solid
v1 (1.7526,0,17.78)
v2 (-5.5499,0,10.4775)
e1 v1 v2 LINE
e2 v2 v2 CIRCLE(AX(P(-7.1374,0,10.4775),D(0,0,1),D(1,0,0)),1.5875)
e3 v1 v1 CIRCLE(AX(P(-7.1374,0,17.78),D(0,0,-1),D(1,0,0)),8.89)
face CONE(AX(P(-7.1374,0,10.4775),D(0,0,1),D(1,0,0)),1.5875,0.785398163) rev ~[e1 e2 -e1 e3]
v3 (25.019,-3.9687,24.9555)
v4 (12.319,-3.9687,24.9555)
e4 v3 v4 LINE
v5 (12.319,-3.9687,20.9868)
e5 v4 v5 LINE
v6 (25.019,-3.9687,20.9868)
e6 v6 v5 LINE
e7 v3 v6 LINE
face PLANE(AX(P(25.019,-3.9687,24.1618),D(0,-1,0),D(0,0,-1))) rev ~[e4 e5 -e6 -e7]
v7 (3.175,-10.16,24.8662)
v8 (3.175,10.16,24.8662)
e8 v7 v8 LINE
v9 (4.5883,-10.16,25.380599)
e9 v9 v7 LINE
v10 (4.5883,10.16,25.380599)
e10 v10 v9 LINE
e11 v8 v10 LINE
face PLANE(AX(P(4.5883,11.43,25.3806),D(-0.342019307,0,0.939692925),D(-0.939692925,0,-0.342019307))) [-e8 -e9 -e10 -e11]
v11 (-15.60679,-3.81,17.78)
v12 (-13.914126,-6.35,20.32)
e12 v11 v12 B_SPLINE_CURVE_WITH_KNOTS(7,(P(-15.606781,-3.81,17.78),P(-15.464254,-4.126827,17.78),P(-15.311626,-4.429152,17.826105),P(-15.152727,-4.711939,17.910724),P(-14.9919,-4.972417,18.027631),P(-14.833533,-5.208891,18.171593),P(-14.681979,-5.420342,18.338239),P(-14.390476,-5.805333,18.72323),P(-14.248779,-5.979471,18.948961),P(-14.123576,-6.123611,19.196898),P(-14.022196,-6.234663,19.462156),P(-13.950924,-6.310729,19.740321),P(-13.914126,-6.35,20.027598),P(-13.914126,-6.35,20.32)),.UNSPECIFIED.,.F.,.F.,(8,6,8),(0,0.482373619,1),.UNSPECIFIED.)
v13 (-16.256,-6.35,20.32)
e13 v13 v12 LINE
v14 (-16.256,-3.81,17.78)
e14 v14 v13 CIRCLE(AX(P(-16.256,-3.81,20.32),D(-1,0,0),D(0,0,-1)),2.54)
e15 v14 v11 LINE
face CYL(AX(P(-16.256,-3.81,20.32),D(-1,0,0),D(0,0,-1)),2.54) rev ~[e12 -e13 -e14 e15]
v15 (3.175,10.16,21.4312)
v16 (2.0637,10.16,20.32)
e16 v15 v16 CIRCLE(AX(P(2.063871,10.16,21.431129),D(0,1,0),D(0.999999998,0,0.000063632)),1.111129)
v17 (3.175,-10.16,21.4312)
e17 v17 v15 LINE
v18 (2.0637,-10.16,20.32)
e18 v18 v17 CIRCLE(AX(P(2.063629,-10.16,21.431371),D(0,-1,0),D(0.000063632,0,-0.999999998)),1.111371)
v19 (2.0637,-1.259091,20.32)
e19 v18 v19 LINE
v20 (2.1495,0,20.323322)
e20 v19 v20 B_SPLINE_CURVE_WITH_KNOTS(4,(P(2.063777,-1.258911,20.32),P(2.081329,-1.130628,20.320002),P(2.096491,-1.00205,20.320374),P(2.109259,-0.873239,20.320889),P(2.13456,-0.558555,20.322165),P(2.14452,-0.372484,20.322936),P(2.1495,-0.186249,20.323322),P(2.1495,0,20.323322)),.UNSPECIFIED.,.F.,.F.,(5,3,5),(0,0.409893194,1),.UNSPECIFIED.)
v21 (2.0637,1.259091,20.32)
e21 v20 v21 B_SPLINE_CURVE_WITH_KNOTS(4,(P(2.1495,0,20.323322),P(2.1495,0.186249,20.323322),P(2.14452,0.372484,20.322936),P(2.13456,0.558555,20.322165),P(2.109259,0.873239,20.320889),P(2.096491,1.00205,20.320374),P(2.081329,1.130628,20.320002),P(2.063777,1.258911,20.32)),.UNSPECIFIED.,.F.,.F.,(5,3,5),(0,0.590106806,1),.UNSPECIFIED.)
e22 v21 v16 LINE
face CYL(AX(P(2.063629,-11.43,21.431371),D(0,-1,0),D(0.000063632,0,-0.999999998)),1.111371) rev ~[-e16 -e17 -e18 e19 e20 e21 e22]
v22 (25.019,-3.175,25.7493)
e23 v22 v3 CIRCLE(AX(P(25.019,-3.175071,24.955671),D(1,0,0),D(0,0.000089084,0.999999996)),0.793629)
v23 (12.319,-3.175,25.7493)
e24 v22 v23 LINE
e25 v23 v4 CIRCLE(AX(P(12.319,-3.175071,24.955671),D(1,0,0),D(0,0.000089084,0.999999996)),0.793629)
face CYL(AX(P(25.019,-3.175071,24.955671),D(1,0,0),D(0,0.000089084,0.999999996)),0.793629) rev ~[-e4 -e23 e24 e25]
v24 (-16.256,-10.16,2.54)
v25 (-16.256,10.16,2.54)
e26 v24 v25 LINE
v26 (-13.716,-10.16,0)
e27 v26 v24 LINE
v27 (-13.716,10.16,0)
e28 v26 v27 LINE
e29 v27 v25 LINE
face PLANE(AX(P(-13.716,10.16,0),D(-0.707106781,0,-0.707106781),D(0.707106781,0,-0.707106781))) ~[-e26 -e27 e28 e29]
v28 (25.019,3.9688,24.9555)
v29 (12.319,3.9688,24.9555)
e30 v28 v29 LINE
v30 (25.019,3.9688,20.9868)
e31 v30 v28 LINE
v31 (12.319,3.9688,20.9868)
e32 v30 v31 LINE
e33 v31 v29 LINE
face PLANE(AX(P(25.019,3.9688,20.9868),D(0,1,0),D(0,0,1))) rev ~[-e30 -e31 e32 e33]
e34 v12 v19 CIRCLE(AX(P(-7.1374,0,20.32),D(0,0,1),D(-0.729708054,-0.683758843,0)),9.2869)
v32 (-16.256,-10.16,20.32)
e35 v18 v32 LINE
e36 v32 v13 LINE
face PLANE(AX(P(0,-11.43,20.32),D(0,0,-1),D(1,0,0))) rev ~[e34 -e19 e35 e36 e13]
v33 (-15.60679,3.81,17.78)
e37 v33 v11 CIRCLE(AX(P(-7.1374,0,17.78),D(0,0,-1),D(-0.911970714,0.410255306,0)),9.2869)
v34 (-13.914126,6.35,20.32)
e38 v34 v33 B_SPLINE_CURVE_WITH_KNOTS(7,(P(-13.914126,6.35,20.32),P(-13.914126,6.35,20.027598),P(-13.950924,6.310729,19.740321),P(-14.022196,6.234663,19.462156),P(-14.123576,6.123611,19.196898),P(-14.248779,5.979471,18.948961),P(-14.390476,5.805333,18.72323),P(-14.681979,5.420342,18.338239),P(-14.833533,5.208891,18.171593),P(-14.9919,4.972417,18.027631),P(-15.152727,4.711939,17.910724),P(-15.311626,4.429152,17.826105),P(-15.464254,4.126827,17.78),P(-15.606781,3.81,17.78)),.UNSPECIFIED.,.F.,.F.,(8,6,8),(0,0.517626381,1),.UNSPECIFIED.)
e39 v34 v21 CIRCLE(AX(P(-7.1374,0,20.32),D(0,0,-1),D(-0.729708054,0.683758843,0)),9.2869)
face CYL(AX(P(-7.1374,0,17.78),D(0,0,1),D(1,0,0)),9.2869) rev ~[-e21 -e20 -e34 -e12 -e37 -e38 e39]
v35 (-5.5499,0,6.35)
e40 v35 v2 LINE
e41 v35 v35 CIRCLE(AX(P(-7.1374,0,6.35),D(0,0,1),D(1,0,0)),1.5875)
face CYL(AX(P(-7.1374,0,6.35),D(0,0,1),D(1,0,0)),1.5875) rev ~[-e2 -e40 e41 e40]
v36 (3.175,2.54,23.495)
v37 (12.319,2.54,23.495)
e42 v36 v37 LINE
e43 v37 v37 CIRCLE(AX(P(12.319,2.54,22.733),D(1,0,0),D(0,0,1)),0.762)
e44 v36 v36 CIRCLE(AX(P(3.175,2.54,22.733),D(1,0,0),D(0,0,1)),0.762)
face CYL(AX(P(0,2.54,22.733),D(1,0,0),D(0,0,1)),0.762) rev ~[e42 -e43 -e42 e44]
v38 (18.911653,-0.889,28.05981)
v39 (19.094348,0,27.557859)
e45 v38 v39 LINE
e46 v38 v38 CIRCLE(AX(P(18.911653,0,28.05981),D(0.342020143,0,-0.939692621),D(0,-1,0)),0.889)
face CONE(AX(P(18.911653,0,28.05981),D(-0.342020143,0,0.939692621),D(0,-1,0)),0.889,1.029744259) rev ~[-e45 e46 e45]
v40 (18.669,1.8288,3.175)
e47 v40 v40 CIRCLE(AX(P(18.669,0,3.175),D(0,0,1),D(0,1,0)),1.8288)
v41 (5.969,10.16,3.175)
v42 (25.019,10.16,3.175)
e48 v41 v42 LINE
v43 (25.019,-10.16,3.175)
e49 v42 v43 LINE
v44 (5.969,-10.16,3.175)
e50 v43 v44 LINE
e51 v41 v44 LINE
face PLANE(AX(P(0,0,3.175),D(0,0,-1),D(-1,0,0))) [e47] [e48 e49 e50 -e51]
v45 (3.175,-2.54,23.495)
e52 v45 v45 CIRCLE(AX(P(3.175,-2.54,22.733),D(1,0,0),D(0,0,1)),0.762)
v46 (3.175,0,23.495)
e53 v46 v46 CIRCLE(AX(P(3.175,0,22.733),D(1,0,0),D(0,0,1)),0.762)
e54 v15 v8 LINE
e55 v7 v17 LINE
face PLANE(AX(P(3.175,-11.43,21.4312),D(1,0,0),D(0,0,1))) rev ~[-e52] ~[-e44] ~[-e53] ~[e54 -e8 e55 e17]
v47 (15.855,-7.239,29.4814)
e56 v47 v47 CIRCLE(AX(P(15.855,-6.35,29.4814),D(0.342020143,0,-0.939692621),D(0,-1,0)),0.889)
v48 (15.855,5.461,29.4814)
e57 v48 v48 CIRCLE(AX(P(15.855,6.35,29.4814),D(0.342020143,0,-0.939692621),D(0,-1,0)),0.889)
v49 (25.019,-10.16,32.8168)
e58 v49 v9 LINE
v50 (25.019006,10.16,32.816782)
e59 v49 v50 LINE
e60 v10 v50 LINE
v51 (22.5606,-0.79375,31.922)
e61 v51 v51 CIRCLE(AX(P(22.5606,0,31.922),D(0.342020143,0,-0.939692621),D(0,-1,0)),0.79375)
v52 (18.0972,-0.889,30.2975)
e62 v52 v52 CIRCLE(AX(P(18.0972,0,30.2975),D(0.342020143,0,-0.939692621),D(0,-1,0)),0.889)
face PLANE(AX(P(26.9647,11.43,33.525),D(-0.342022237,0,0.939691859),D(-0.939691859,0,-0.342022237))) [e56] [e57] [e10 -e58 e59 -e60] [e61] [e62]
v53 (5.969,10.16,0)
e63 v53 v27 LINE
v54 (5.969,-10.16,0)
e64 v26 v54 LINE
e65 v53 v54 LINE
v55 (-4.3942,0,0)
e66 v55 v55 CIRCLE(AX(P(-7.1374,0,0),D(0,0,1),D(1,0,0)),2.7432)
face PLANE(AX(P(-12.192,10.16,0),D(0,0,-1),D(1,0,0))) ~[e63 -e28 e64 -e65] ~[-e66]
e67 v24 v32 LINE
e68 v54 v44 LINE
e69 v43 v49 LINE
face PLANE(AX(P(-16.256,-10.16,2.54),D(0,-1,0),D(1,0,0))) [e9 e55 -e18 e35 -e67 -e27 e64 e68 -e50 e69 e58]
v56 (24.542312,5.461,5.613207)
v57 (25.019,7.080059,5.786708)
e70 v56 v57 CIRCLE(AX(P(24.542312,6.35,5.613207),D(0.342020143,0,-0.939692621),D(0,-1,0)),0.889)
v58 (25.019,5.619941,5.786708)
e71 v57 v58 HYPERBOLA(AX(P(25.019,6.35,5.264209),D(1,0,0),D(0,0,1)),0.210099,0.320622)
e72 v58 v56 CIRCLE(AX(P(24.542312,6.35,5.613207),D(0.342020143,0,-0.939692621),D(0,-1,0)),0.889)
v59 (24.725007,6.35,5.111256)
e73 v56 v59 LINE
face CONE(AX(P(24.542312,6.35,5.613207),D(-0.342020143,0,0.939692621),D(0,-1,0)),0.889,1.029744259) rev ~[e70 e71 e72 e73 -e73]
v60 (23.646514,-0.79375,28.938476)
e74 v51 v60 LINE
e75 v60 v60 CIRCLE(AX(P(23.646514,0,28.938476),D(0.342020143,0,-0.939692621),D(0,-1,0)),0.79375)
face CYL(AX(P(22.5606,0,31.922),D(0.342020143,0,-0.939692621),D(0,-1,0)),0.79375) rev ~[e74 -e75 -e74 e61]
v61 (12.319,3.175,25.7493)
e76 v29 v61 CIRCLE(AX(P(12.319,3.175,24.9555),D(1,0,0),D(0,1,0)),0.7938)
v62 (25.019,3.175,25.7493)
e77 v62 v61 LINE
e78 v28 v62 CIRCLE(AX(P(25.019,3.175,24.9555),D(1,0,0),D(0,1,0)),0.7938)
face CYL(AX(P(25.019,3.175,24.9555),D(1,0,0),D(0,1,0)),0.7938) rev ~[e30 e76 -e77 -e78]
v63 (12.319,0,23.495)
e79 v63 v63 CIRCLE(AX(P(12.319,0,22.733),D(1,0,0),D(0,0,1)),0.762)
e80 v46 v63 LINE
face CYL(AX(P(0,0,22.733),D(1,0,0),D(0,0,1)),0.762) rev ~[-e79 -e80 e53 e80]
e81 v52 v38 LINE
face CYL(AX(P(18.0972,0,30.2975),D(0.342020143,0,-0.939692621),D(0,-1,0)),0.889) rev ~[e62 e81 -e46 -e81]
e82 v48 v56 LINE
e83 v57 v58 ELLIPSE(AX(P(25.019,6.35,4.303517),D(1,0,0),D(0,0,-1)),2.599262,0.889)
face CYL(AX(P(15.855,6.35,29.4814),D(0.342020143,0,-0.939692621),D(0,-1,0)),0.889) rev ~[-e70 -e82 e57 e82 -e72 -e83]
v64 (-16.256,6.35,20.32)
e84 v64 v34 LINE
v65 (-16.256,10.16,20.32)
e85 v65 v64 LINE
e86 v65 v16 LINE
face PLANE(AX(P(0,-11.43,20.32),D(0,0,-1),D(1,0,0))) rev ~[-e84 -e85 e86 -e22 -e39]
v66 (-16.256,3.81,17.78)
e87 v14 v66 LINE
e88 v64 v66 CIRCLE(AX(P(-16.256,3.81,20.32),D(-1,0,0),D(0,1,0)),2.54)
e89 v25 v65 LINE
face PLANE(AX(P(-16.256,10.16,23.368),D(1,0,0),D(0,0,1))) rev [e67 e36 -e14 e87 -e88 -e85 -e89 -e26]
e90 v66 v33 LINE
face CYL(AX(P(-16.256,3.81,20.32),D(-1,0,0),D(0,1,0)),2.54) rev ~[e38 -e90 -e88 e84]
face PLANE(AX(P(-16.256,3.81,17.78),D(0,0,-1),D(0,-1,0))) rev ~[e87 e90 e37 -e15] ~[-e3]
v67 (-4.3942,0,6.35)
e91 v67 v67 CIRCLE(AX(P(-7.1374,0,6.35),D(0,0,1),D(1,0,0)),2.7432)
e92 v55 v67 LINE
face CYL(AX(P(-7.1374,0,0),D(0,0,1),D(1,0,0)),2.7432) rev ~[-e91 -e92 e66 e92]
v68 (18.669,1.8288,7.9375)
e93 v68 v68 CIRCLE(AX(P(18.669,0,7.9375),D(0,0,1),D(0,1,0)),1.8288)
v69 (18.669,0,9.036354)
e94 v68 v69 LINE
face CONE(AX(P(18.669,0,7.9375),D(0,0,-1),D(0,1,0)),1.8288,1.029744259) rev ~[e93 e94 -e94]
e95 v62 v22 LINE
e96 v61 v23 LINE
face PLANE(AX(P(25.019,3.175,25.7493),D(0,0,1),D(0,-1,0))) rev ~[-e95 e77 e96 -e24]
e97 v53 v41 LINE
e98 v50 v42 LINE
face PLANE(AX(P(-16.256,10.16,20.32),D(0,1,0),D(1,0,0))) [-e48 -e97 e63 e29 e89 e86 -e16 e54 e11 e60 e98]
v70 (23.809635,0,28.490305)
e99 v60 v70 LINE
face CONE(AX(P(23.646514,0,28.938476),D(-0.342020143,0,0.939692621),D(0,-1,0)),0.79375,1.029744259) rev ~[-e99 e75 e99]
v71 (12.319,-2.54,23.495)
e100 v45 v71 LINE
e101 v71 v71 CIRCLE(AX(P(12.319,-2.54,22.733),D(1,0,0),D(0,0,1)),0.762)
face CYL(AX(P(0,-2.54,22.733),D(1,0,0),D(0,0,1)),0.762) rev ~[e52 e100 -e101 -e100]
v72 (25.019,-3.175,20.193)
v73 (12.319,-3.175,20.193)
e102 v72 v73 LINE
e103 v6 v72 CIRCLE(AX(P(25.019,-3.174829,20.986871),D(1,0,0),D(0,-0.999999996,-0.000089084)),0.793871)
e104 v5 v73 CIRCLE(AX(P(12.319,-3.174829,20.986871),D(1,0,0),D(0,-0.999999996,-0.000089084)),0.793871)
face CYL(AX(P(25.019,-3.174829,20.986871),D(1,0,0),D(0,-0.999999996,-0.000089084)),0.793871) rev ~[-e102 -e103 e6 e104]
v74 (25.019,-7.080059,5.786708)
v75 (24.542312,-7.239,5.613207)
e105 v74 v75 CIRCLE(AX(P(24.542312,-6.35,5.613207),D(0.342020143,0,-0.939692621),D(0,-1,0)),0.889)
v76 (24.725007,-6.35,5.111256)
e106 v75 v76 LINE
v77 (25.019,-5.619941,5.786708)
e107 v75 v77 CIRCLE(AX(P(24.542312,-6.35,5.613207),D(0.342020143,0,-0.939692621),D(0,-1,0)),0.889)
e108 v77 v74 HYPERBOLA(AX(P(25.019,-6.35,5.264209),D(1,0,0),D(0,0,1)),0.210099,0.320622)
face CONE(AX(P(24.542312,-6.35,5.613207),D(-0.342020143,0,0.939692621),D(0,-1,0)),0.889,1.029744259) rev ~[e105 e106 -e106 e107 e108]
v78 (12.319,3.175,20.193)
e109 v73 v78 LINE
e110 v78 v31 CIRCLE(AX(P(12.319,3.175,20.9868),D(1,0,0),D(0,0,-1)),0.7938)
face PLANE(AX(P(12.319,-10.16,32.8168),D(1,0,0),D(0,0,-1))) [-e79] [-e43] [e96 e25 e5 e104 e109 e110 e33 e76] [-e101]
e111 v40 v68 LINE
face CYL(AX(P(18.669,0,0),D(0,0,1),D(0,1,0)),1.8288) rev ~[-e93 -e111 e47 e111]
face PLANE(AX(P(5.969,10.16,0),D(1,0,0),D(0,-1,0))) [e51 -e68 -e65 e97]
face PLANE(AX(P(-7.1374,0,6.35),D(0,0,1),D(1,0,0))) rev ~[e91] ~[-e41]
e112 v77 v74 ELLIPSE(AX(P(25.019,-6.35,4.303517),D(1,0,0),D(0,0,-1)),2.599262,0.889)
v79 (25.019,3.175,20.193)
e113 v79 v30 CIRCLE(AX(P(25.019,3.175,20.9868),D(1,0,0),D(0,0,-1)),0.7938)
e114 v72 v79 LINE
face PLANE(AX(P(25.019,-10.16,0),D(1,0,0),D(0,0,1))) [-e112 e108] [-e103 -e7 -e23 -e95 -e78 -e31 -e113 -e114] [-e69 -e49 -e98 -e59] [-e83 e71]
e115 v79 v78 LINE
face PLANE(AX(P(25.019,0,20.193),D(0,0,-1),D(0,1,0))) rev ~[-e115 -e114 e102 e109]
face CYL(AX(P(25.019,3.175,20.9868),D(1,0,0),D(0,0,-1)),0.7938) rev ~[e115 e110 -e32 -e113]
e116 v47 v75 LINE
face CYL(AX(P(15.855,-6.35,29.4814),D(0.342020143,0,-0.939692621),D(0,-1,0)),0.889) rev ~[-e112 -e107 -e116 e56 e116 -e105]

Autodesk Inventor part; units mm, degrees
sketch "Sketch1" plane through (0, 0, 0) normal (0, 0, 1) x (1, 0, 0)
  line L0 (0, 24.892) -> (0, -24.892) projected
  line L1 (-25.6032, 0) -> (39.8272, 0) projected
  line L2 (30.48, -17.78) -> (-16.256, -17.78)
  line L3 (-16.256, -17.78) -> (-16.256, 17.78)
  line L4 (-16.256, 17.78) -> (30.48, 17.78)
  line L5 (30.48, 17.78) -> (30.48, -17.78)
  dimension "d0" = 30.48
  dimension "d1" = 16.256
  dimension "d2" = 17.78
  dimension "d3" = 35.56
extrude "Extrusion1" add sketch "Sketch1" along normal blind 45.72
sketch "Sketch2" plane through (-16.256, -17.78, 0) normal (0, -1, 0) x (1, 0, 0)
  line L0 (46.736, 45.72) -> (0, 45.72) projected
  line L1 (0, 0) -> (0, 45.72) projected
  line L2 (46.736, 0) -> (0, 0) projected
  line L3 (16.256, 54.864) -> (16.256, -9.144) projected
  line L4 (16.256, 45.72) -> (16.256, 20.32)
  line L5 (16.256, 20.32) -> (4.064, 20.32)
  line L6 (4.064, 20.32) -> (4.064, 23.368)
  arc A0 (4.064, 23.368) -> (0, 23.368) centre (2.032, 23.368) ccw
  line L7 (0, 23.368) -> (0, 45.72)
  line L8 (0, 45.72) -> (16.256, 45.72)
  line L9 (0, 2.54) -> (2.54, 0)
  line L10 (2.54, 0) -> (0, 0)
  line L11 (0, 0) -> (0, 2.54)
  dimension "d6" = 25.4
  dimension "d7" = 2.032
  dimension "d8" = 2.032
  dimension "d9" = 3.048
  dimension "d10" = 2.54
  dimension "d11" = 2.54
  dimension "d12" = 4.064
extrude "Extrusion2" cut sketch "Sketch2" against normal through all contours L3 L5 L6 A0 L1 L0 | L9 L2 L1
sketch "Sketch3" plane through (-16.256, -17.78, 23.368) normal (-1, 0, 0) x (0, 0, 1)
  line L0 (-20.828, 35.56) -> (0, 35.56) projected
  line L1 (-20.828, 0) -> (0, 0) projected
  line L2 (-32.512, 17.78) -> (31.496, 17.78) projected
  line L3 (2.032, 35.56) -> (2.032, 0) projected
  line L4 (2.032, 35.56) -> (0, 35.56) projected
  line L5 (-23.368, 35.56) -> (-20.828, 35.56) projected
  line L6 (-20.828, 0) -> (-23.368, 0) projected
  line L7 (0, 0) -> (2.032, 0) projected
  line L8 (2.032, 0) -> (-23.368, 0)
  line L9 (-23.368, 0) -> (-23.368, 5.08)
  line L10 (-23.368, 5.08) -> (-3.048, 5.08)
  line L11 (-3.048, 5.08) -> (-3.048, 6.35)
  line L12 (-3.048, 6.35) -> (2.032, 6.35)
  line L13 (2.032, 6.35) -> (2.032, 0)
  line L14 (-20.828, 35.56) -> (0, 35.56)
  line L15 (-20.828, 35.56) -> (-23.368, 35.56)
  line L16 (0, 35.56) -> (2.032, 35.56)
  line L17 (2.032, 35.56) -> (-23.368, 35.56)
  line L18 (-23.368, 35.56) -> (-23.368, 30.48)
  line L19 (-23.368, 30.48) -> (-3.048, 30.48)
  line L20 (-3.048, 30.48) -> (-3.048, 29.21)
  line L21 (-3.048, 29.21) -> (2.032, 29.21)
  line L22 (2.032, 29.21) -> (2.032, 35.56)
  dimension "d15" = 6.35
  dimension "d16" = 5.08
  dimension "d17" = 5.08
extrude "Extrusion3" cut sketch "Sketch3" against normal up to surface (16.256 mm away)
sketch "Sketch4" plane through (-16.256, -12.7, 2.54) normal (-1, 0, 0) x (0, 0, 1)
  line L0 (-11.684, 12.7) -> (52.324, 12.7) projected
  line L1 (22.86, 24.13) -> (22.86, 1.27) projected
  line L2 (22.86, 12.7) -> (22.86, 6.35)
  line L3 (17.78, 6.35) -> (22.86, 6.35)
  line L4 (15.24, 8.89) -> (15.24, 12.7)
  line L5 (15.24, 12.7) -> (22.86, 12.7)
  arc A0 (15.24, 8.89) -> (17.78, 6.35) centre (17.78, 8.89) ccw
  line L6 (22.86, 12.7) -> (22.86, 19.05)
  line L7 (17.78, 19.05) -> (22.86, 19.05)
  line L8 (15.24, 16.51) -> (15.24, 12.7)
  arc A1 (17.78, 19.05) -> (15.24, 16.51) centre (17.78, 16.51) ccw
  dimension "d20" = 2.54
  dimension "d21" = 6.35
  dimension "d22" = 7.62
extrude "Extrusion4" cut sketch "Sketch4" against normal blind 7.874
sketch "Sketch11" plane through (0, -17.78, 0) normal (-1, 0, 0) x (0, 0, 1)
  line L0 (20.32, 5.08) -> (20.32, 30.48) projected
  line L1 (45.72, 35.56) -> (45.72, 0) projected
  line L2 (-9.144, 17.78) -> (54.864, 17.78) projected
  line L3 (20.32, 25.4) -> (20.32, 10.16) projected
  point P0 (20.32, 24.3791)
  point P1 (20.32, 11.1809)
  point P2 (43.18, 16.51)
  point P3 (43.18, 19.05)
  point P4 (23.368, 17.78)
  point P5 (22.733, 17.78)
  dimension "d73" = 1.27
  dimension "d74" = 1.27
  dimension "d75" = 2.54
  dimension "d76" = 2.54
  dimension "d78" = 0.635
  dimension "d476" = 2.413
hole "Hole3" at (0, 0, 22.733) direction (1, 0, 0) diameter 1.524 end through all
sketch "Sketch21" plane through (0, 0, 0) normal (0, 1, 0) x (-1, 0, 0)
  line L0 (0, -4.064) -> (0, 24.384) projected
  line L1 (13.716, 0) -> (0, 0) projected
  line L2 (16.256, 20.32) -> (16.256, 2.54) projected
  line L3 (4.3942, 0) -> (7.1374, 0)
  line L4 (4.3942, 0) -> (4.3942, 6.35)
  line L5 (4.3942, 6.35) -> (5.5499, 6.35)
  line L6 (5.5499, 6.35) -> (5.5499, 10.4775)
  line L7 (0, 20.32) -> (16.256, 20.32) projected
  line L8 (7.1374, 0) -> (7.1374, 20.32)
  line L9 (5.5499, 10.4775) -> (-1.7526, 17.78)
  line L10 (-1.7526, 17.78) -> (-1.7526, 20.32)
  line L11 (-1.7526, 20.32) -> (7.1374, 20.32)
  line L12 (-1.7526, 17.78) -> (-2.1495, 17.78)
  line L13 (-2.1495, 17.78) -> (-2.1495, 20.32)
  line L14 (-2.1495, 20.32) -> (-1.7526, 20.32)
  line L15 (-1.7526, 20.32) -> (-1.7526, 17.78)
  dimension "d159" = 7.1374
  dimension "d160" = 8.89
  dimension "d162" = 45
  dimension "d163" = 1.5875
  dimension "d164" = 2.7432
  dimension "d165" = 6.35
  dimension "d292" = 0.3969
  dimension "d322" = 2.54
revolve "Revolution5" cut sketch "Sketch21" angle 360 about axis through (-7.1374, 0, 0) along (0, 0, 1) contours L9 L10 L11 L0 | L0 L7 L8 L1 L4 L5 L6 L9 | L12 L13 L14 L10
sketch "Sketch23" plane through (0, 0, 0) normal (0, 0, -1) x (-1, 0, 0)
  line L0 (13.716, 12.7) -> (0, 12.7) projected
  line L1 (0, 17.78) -> (-30.48, 17.78) projected
  line L2 (-39.8272, 0) -> (25.6032, 0) projected
  line L3 (16.256, 12.7) -> (16.256, -12.7) projected
  line L4 (0, -12.7) -> (13.716, -12.7) projected
  line L5 (-30.48, -17.78) -> (0, -17.78) projected
  line L6 (8.382, -12.7) -> (8.382, -11.43)
  line L7 (-30.48, 17.78) -> (-30.48, -17.78) projected
  line L8 (8.382, -11.43) -> (-30.48, -11.43)
  line L9 (-30.48, -11.43) -> (-30.48, -17.78)
  line L10 (-30.48, -17.78) -> (8.382, -17.78)
  line L11 (8.382, -17.78) -> (8.382, -12.7)
  dimension "d193" = 7.874
  dimension "d231" = 6.35
extrude "Extrusion12" cut sketch "Sketch23" against normal blind 27.94
mirror "Mirror5" about plane through (0, 0, 0) normal (0, 1, 0) of "Extrusion12"
sketch "Sketch32" plane through (0, 17.78, 45.72) normal (0, 1, 0) x (1, 0, 0)
  line L0 (30.48, 17.78) -> (0, 17.78) projected
  line L1 (0, 17.78) -> (0, 0) projected
  line L2 (0, 0) -> (30.48, 0) projected
  line L3 (30.48, 17.78) -> (30.48, 0) projected
extrude "Extrusion16" cut sketch "Sketch32" against normal up to surface (6.35 mm away)
sketch "Sketch33" plane through (0, -17.78, 45.72) normal (0, -1, 0) x (1, 0, 0)
  circle A0 centre (3.1266, -12.4245) radius 0.7366 projected
  line L0 (0, -17.78) -> (30.48, -17.78) projected
  line L1 (30.48, -17.78) -> (30.48, 0) projected
  line L2 (30.48, 0) -> (0, 0) projected
  line L3 (0, 0) -> (0, -17.78) projected
extrude "Extrusion17" cut sketch "Sketch33" against normal up to surface (6.35 mm away)
sketch "Sketch34" plane through (0, 11.43, 45.72) normal (0, 1, 0) x (1, 0, 0)
  line L0 (0, 0) -> (0, 25.4) projected
  line L1 (30.48, 0) -> (0, 0) projected
  line L2 (30.48, 45.72) -> (30.48, 0) projected
  line L3 (26.9647, 12.195) -> (4.5883, 20.3394) projected
  line L4 (26.9647, 12.195) -> (30.48, 10.9156)
  line L5 (4.5883, 20.3394) -> (0, 22.0094)
  point P0 (0, 24.13)
extrude "Extrusion18" cut sketch "Sketch34" along normal through all both and the other way through all
sketch "Sketch35" plane through (-8.382, -11.43, 0) normal (0, -1, 0) x (1, 0, 0)
  line L0 (38.862, 34.8044) -> (8.382, 23.7106) projected
  line L1 (8.382, 20.32) -> (8.382, 23.7106) projected
  line L2 (38.862, 34.8044) -> (38.862, 0) projected
  line L3 (8.382, 20.32) -> (10.4457, 20.32)
  line L4 (11.557, 21.4312) -> (11.557, 24.8662)
  arc A0 (10.4457, 20.32) -> (11.557, 21.4312) centre (10.4457, 21.4312) ccw
  dimension "d284" = 1.1113
  dimension "d285" = 3.175
extrude "Extrusion19" cut sketch "Sketch35" against normal through all
sketch "Sketch38" plane through (0, 0, 0) normal (0, 0, -1) x (-1, 0, 0)
  line L0 (8.382, 11.43) -> (17.907, 11.43)
  line L1 (17.907, 11.43) -> (17.907, 14.605)
  line L2 (17.907, 14.605) -> (8.382, 14.605)
  line L3 (8.382, -11.43) -> (17.907, -11.43)
  line L4 (17.907, -11.43) -> (17.907, -14.605)
  line L5 (17.907, -14.605) -> (8.382, -14.605)
  line L6 (13.716, 12.7) -> (8.382, 12.7) projected
  line L7 (8.382, 11.43) -> (8.382, 14.605)
  line L8 (8.382, -11.43) -> (8.382, -14.605)
  dimension "d293" = 3.175
  dimension "d294" = 3.175
  dimension "d295" = 9.525
extrude "Extrusion22" cut sketch "Sketch38" against normal through all
sketch "Sketch39" plane through (-16.256, -11.43, 2.54) normal (0, -1, 0) x (1, 0, 0)
  line L0 (4.064, 17.78) -> (18.3197, 17.78) projected
  line L1 (4.064, 20.828) -> (4.064, 17.78) projected
  arc A0 (4.064, 20.828) -> (0, 20.828) centre (2.032, 20.828) ccw projected
  line L2 (0, 0) -> (0, 20.828) projected
  line L3 (2.54, -2.54) -> (0, 0) projected
  line L4 (46.736, -2.54) -> (2.54, -2.54) projected
  line L5 (46.736, 32.2644) -> (46.736, -2.54) projected
  line L6 (46.736, 32.2644) -> (19.431, 22.3262) projected
  line L7 (19.431, 22.3262) -> (19.431, 18.8912) projected
  arc A1 (18.3197, 17.78) -> (19.431, 18.8912) centre (18.3197, 18.8912) ccw projected
  line L8 (4.4328, 17.78) -> (0, 17.78)
extrude "Extrusion23" cut sketch "Sketch39" against normal through all contours L8 L2 A0 L1
sketch "Sketch45" plane through (-16.256, -11.43, 2.54) normal (0, -1, 0) x (1, 0, 0)
  line L0 (0, 17.78) -> (18.3197, 17.78) projected
  line L1 (0, 0) -> (0, 17.78) projected
  line L2 (2.54, -2.54) -> (0, 0) projected
  line L3 (46.736, -2.54) -> (2.54, -2.54) projected
  line L4 (46.736, 32.2644) -> (46.736, -2.54) projected
  line L5 (46.736, 32.2644) -> (19.431, 22.3262) projected
  line L6 (19.431, 22.3262) -> (19.431, 18.8912) projected
  arc A0 (18.3197, 17.78) -> (19.431, 18.8912) centre (18.3197, 18.8912) ccw projected
  circle A1 centre (2.3813, 7.62) radius 1.1906 projected
extrude "Extrusion29" cut sketch "Sketch45" against normal blind 1.27 contours L0 A0 L6 L5 L4 L3 L2 L1 | A1
sketch "Sketch46" plane through (-16.256, 11.43, 20.32) normal (0, 1, 0) x (1, 0, 0)
  line L0 (0, 0) -> (18.3197, 0) projected
  arc A0 (19.431, -1.1112) -> (18.3197, 0) centre (18.3197, -1.1112) ccw projected
  line L1 (19.431, -1.1112) -> (19.431, -4.5462) projected
  line L2 (19.431, -4.5462) -> (46.736, -14.4844) projected
  line L3 (46.736, 20.32) -> (46.736, -14.4844) projected
  line L4 (2.54, 20.32) -> (46.736, 20.32) projected
  line L5 (0, 17.78) -> (2.54, 20.32) projected
  line L6 (0, 0) -> (0, 17.78) projected
  circle A1 centre (2.3813, 10.16) radius 1.1906 projected
extrude "Extrusion30" cut sketch "Sketch46" against normal blind 1.27 contours L6 L5 L4 L3 L2 L1 A0 L0 | A1
sketch "Sketch47" plane through (-16.256, -10.16, 2.54) normal (0, -1, 0) x (1, 0, 0)
  line L0 (0, 0) -> (0, 17.78) projected
  line L1 (46.736, -2.54) -> (2.54, -2.54) projected
  line L2 (46.736, 32.2644) -> (46.736, -2.54) projected
  line L3 (19.431, 22.3262) -> (46.736, 32.2644) projected
  line L4 (0, 17.78) -> (18.3197, 17.78) projected
  line L5 (41.275, -2.54) -> (41.275, 30.2768)
  dimension "d327" = 41.275
extrude "Extrusion31" cut sketch "Sketch47" against normal through all
sketch "Sketch49" plane through (0, 0, 0) normal (0, 0, -1) x (-1, 0, 0)
  circle A0 centre (-18.669, 0) radius 2.0574 projected
  line L0 (-5.969, -18.288) -> (-5.969, 13.462) projected
  line L1 (-31.369, -18.288) -> (-5.969, -18.288) projected
  line L2 (-31.369, -18.288) -> (-31.369, 13.462) projected
  line L3 (-31.369, 13.462) -> (-5.969, 13.462) projected
hole "Hole11" at (18.669, 0, 0) direction (0, 0, 1) diameter 3.6576 depth 7.9375 tip angle 118 clearance for "Flat Head Machine Screw (82)" size "#6" standard "Ansi Unified Screw Threads"
sketch "Sketch50" plane through (0, 0, 0) normal (0, 0, -1) x (-1, 0, 0)
  circle A0 centre (-18.669, 0) radius 1.8288 projected
  line L0 (13.716, 10.16) -> (-25.019, 10.16) projected
  line L1 (-25.019, 10.16) -> (-25.019, -10.16) projected
  line L2 (-25.019, -10.16) -> (13.716, -10.16) projected
  line L3 (-5.969, 10.16) -> (-5.969, -10.16)
  point P0 (-5.969, -10.16)
  point P1 (-5.969, 10.16)
  dimension "d340" = 19.05
extrude "Extrusion33" cut sketch "Sketch50" against normal blind 3.175
sketch "Sketch51" plane through (25.019, -10.16, 32.8168) normal (1, 0, 0) x (0, 0, -1)
  circle A0 centre (10.0838, 10.16) radius 0.762 projected
  circle A1 centre (9.4488, 10.16) radius 0.508 projected
  line L0 (8.655, 8.5725) -> (11.0363, 8.5725)
  line L1 (11.0363, 8.5725) -> (11.0363, 11.7475)
  line L2 (11.0363, 11.7475) -> (8.655, 11.7475)
  line L3 (8.655, 11.7475) -> (8.655, 8.5725)
  circle A2 centre (8.655, 10.16) radius 1.5875
  circle A3 centre (11.0363, 10.16) radius 1.5875
  line L4 (-6.5634, 10.16) -> (39.3801, 10.16) projected
  line L5 (7.8613, 6.1913) -> (11.83, 6.1913)
  line L6 (12.6238, 6.985) -> (12.6238, 13.335)
  line L7 (11.83, 14.1288) -> (7.8613, 14.1288)
  line L8 (7.0675, 13.335) -> (7.0675, 6.985)
  arc A4 (7.0675, 7.7788) -> (8.655, 6.1913) centre (8.655, 7.7788) ccw
  arc A5 (12.6238, 13.335) -> (11.83, 14.1288) centre (11.83, 13.335) ccw
  arc A6 (11.83, 6.1913) -> (12.6238, 6.985) centre (11.83, 6.985) ccw
  arc A7 (7.8613, 14.1288) -> (7.0675, 13.335) centre (7.8613, 13.335) ccw
  arc A8 (7.0675, 6.985) -> (7.8613, 6.1913) centre (7.8613, 6.985) ccw
  dimension "d344" = 3.175
  dimension "d345" = 0
  dimension "d347" = 2.3813
  dimension "d352" = 0.9525
  dimension "d412" = 7.9375
  dimension "d413" = 3.9688
  dimension "d414" = 1.5875
  dimension "d415" = 0.7937
extrude "Extrusion34" cut sketch "Sketch51" against normal blind 12.7
sketch "Sketch53" plane through (-16.256, -10.16, 2.54) normal (0, -1, 0) x (1, 0, 0)
  line L0 (0, 17.78) -> (18.3197, 17.78) projected
  line L1 (0, 17.78) -> (4.064, 17.78)
  line L2 (4.064, 17.78) -> (4.064, 20.828)
  line L3 (4.064, 20.828) -> (0, 20.828)
  line L4 (0, 20.828) -> (0, 17.78)
  circle A0 centre (2.032, 20.828) radius 2.032
  dimension "d353" = 4.064
  dimension "d354" = 3.048
extrude "Extrusion36" add sketch "Sketch53" against normal blind 3.81
sketch "Sketch54" plane through (-16.256, -10.16, 2.54) normal (0, -1, 0) x (1, 0, 0)
  line L0 (4.064, 17.78) -> (4.064, 20.828) projected
  arc A0 (4.064, 20.828) -> (0, 20.828) centre (2.032, 20.828) ccw projected
  line L1 (0, 20.828) -> (0, 0) projected
  line L2 (2.54, -2.54) -> (0, 0) projected
  line L3 (22.225, -2.54) -> (2.54, -2.54) projected
  line L4 (4.064, 17.78) -> (4.064, -2.54)
extrude "Extrusion37" add sketch "Sketch54" along normal blind 3.175
sketch "Sketch55" plane through (-16.256, -13.335, 2.54) normal (0, -1, 0) x (1, 0, 0)
  arc A0 (4.064, 20.828) -> (0, 20.828) centre (2.032, 20.828) ccw projected
  point P0 (2.032, 20.828)
hole "Hole12" at (-14.224, -13.335, 23.368) direction (0, 1, 0) diameter 1.1906 depth 9.525 counterbore diameter 3.048 counterbore depth 5.334
sketch "Sketch56" plane through (2.0637, 1.2589, 20.32) normal (0, 0, 1) x (1, 0, 0)
  arc A0 (0, 0) -> (0, -2.5178) centre (-9.2011, -1.2589) ccw projected
  circle A1 centre (-9.2011, -1.2589) radius 9.2869
  point P0 (-14.2557, 6.5319)
extrude "Extrusion38" cut sketch "Sketch56" along normal blind 25.4
sketch "Sketch60" plane through (-16.256, -13.335, 2.54) normal (0, -1, 0) x (1, 0, 0)
  circle A0 centre (2.032, 20.828) radius 1.524 projected
  line L0 (4.064, 20.828) -> (4.064, -2.54) projected
  arc A1 (4.064, 20.828) -> (0, 20.828) centre (2.032, 20.828) ccw projected
  line L1 (0, 0) -> (0, 20.828) projected
  line L2 (0, 17.653) -> (4.064, 17.653)
  dimension "d378" = 3.175
extrude "Extrusion41" cut sketch "Sketch60" against normal blind 1.27
sketch "Sketch62" plane through (-16.256, -13.335, 2.54) normal (0, -1, 0) x (1, 0, 0)
  line L0 (4.064, 11.303) -> (0, 11.303) projected
  line L1 (0, 0) -> (0, 17.653) projected
  line L2 (2.54, -2.54) -> (0, 0) projected
  line L3 (4.064, -2.54) -> (2.54, -2.54) projected
  line L4 (4.064, 17.653) -> (4.064, -2.54) projected
extrude "Extrusion43" cut sketch "Sketch62" against normal up to surface (3.175 mm away)
fillet "Fillet2" radius 0.4001 1 edges at (-14.224, -12.065, 20.193)
ref_plane "Work Plane10" through (-16.256, -14.605, 2.54) normal (0, -1, 0) x (1, 0, 0)
mirror "Mirror8" about plane through (0, 0, 0) normal (0, 1, 0) of "Hole12", "Extrusion38", "Extrusion37", "Extrusion36", "Extrusion41", "Extrusion43", "Fillet2"
pattern_linear "Rectangular Pattern1" count 2 spacing 2.54 along (0, 1, 0) of "Hole3"
pattern_linear "Rectangular Pattern2" count 2 spacing 2.54 along (0, -1, 0) of "Hole3"
ref_plane "Work Plane3" through (-16.256, 10.16, 3.4607) normal (-0.9396926, -0.3420201, 0) x (0, 0, -1)
ref_plane "Work Plane4" through (-15.4206, 10.4641, 3.4607) normal (-0.9396926, -0.3420201, 0) x (0, 0, -1)
sketch "Sketch65" plane through (-16.256, -3.81, 17.78) normal (-1, 0, 0) x (0, 0, 1)
  line L0 (-3.937, 13.97) -> (8.3591, 13.97)
  line L1 (8.3591, 13.97) -> (8.3591, 19.1782)
  line L2 (8.3591, 19.1782) -> (-3.937, 19.1782)
  line L3 (-3.937, 19.1782) -> (-3.937, 13.97)
  line L4 (-4.3371, -6.35) -> (8.3591, -6.35)
  line L5 (8.3591, -6.35) -> (8.3591, -11.3681)
  line L6 (8.3591, -11.3681) -> (-4.3371, -11.3681)
  line L7 (-4.3371, -11.3681) -> (-4.3371, -6.35)
  line L8 (8.3591, 19.1782) -> (2.54, 19.1782)
  line L9 (2.54, 19.1782) -> (2.54, 10.16)
  line L10 (2.54, 10.16) -> (8.3591, 10.16)
  line L11 (8.3591, 10.16) -> (8.3591, 19.1782)
  line L12 (8.3591, -11.3681) -> (2.54, -11.3681)
  line L13 (2.54, -11.3681) -> (2.54, -2.54)
  line L14 (2.54, -2.54) -> (8.3591, -2.54)
  line L15 (8.3591, -2.54) -> (8.3591, -11.3681)
extrude "Extrusion44" cut sketch "Sketch65" against normal up to surface (4.064 mm away)
ref_plane "Work Plane5" through (-7.1374, 0, 10.4775) normal (-0.3420201, 0.9396926, 0) x (0, 0, -1)
ref_plane "Work Plane6" through (-7.1374, 0, 10.4775) normal (0, -1, 0) x (0, 0, -1)
sketch "Sketch68" plane through (-16.256, -3.81, 17.78) normal (0, 0, 1) x (1, 0, 0)
  line L0 (0, 7.62) -> (0.6492, 7.62) projected
  line L1 (0, 0) -> (0, 7.62) projected
  line L2 (0, 0) -> (0.6492, 0) projected
  arc A0 (0.6492, 0) -> (0.6492, 7.62) centre (9.1186, 3.81) ccw projected
extrude "Extrusion47" cut sketch "Sketch68" along normal blind 25.4
sketch "Sketch71" plane through (3.175, -10.16, 24.8662) normal (-0.3420201, 0, 0.9396926) x (0.9396926, 0, 0.3420201)
  circle A0 centre (13.4938, 16.51) radius 1.2192
  circle A1 centre (13.4938, 3.81) radius 1.2192
  point P0 (-11.4883, 10.16)
hole "Hole14" at (15.855, -6.35, 29.4814) at (15.855, 6.35, 29.4814) direction (0.3420201, 0, -0.9396926) diameter 1.778 depth 25.4 tip angle 118 clearance for "Flat Head Machine Screw (82)" size "#0" standard "Ansi Unified Screw Threads"
sketch "Sketch77" plane through (3.175, -10.16, 24.8662) normal (-0.3420201, 0, 0.9396926) x (0.9396926, 0, 0.3420201)
  line L0 (33.2479, 10.16) -> (-36.7659, 10.16) projected
  line L1 (23.2459, 0) -> (23.2459, 20.32) projected
  point P0 (-11.4883, 10.16)
  point P1 (20.6297, 10.16)
  dimension "d460" = 2.6162
hole "Hole15" at (22.5606, 0, 31.922) direction (0.3420201, 0, -0.9396926) diameter 1.5875 depth 3.175 tip angle 118
sketch "Sketch78" plane through (3.175, -10.16, 24.8662) normal (-0.3420201, 0, 0.9396926) x (0.9396926, 0, 0.3420201)
  line L0 (33.2479, 10.16) -> (-36.7659, 10.16) projected
  line L1 (23.2459, 0) -> (23.2459, 20.32) projected
  point P0 (-11.4883, 10.16)
  point P1 (15.8799, 10.16)
  dimension "d468" = 7.366
hole "Hole16" at (18.0972, 0, 30.2975) direction (0.3420201, 0, -0.9396926) diameter 1.778 depth 2.3813 tip angle 118 clearance for "Flat Head Machine Screw (82)" size "#0" standard "Ansi Unified Screw Threads"
equation "\"d2\" = 0.5 * d3"
properties part number "OdorBase"
